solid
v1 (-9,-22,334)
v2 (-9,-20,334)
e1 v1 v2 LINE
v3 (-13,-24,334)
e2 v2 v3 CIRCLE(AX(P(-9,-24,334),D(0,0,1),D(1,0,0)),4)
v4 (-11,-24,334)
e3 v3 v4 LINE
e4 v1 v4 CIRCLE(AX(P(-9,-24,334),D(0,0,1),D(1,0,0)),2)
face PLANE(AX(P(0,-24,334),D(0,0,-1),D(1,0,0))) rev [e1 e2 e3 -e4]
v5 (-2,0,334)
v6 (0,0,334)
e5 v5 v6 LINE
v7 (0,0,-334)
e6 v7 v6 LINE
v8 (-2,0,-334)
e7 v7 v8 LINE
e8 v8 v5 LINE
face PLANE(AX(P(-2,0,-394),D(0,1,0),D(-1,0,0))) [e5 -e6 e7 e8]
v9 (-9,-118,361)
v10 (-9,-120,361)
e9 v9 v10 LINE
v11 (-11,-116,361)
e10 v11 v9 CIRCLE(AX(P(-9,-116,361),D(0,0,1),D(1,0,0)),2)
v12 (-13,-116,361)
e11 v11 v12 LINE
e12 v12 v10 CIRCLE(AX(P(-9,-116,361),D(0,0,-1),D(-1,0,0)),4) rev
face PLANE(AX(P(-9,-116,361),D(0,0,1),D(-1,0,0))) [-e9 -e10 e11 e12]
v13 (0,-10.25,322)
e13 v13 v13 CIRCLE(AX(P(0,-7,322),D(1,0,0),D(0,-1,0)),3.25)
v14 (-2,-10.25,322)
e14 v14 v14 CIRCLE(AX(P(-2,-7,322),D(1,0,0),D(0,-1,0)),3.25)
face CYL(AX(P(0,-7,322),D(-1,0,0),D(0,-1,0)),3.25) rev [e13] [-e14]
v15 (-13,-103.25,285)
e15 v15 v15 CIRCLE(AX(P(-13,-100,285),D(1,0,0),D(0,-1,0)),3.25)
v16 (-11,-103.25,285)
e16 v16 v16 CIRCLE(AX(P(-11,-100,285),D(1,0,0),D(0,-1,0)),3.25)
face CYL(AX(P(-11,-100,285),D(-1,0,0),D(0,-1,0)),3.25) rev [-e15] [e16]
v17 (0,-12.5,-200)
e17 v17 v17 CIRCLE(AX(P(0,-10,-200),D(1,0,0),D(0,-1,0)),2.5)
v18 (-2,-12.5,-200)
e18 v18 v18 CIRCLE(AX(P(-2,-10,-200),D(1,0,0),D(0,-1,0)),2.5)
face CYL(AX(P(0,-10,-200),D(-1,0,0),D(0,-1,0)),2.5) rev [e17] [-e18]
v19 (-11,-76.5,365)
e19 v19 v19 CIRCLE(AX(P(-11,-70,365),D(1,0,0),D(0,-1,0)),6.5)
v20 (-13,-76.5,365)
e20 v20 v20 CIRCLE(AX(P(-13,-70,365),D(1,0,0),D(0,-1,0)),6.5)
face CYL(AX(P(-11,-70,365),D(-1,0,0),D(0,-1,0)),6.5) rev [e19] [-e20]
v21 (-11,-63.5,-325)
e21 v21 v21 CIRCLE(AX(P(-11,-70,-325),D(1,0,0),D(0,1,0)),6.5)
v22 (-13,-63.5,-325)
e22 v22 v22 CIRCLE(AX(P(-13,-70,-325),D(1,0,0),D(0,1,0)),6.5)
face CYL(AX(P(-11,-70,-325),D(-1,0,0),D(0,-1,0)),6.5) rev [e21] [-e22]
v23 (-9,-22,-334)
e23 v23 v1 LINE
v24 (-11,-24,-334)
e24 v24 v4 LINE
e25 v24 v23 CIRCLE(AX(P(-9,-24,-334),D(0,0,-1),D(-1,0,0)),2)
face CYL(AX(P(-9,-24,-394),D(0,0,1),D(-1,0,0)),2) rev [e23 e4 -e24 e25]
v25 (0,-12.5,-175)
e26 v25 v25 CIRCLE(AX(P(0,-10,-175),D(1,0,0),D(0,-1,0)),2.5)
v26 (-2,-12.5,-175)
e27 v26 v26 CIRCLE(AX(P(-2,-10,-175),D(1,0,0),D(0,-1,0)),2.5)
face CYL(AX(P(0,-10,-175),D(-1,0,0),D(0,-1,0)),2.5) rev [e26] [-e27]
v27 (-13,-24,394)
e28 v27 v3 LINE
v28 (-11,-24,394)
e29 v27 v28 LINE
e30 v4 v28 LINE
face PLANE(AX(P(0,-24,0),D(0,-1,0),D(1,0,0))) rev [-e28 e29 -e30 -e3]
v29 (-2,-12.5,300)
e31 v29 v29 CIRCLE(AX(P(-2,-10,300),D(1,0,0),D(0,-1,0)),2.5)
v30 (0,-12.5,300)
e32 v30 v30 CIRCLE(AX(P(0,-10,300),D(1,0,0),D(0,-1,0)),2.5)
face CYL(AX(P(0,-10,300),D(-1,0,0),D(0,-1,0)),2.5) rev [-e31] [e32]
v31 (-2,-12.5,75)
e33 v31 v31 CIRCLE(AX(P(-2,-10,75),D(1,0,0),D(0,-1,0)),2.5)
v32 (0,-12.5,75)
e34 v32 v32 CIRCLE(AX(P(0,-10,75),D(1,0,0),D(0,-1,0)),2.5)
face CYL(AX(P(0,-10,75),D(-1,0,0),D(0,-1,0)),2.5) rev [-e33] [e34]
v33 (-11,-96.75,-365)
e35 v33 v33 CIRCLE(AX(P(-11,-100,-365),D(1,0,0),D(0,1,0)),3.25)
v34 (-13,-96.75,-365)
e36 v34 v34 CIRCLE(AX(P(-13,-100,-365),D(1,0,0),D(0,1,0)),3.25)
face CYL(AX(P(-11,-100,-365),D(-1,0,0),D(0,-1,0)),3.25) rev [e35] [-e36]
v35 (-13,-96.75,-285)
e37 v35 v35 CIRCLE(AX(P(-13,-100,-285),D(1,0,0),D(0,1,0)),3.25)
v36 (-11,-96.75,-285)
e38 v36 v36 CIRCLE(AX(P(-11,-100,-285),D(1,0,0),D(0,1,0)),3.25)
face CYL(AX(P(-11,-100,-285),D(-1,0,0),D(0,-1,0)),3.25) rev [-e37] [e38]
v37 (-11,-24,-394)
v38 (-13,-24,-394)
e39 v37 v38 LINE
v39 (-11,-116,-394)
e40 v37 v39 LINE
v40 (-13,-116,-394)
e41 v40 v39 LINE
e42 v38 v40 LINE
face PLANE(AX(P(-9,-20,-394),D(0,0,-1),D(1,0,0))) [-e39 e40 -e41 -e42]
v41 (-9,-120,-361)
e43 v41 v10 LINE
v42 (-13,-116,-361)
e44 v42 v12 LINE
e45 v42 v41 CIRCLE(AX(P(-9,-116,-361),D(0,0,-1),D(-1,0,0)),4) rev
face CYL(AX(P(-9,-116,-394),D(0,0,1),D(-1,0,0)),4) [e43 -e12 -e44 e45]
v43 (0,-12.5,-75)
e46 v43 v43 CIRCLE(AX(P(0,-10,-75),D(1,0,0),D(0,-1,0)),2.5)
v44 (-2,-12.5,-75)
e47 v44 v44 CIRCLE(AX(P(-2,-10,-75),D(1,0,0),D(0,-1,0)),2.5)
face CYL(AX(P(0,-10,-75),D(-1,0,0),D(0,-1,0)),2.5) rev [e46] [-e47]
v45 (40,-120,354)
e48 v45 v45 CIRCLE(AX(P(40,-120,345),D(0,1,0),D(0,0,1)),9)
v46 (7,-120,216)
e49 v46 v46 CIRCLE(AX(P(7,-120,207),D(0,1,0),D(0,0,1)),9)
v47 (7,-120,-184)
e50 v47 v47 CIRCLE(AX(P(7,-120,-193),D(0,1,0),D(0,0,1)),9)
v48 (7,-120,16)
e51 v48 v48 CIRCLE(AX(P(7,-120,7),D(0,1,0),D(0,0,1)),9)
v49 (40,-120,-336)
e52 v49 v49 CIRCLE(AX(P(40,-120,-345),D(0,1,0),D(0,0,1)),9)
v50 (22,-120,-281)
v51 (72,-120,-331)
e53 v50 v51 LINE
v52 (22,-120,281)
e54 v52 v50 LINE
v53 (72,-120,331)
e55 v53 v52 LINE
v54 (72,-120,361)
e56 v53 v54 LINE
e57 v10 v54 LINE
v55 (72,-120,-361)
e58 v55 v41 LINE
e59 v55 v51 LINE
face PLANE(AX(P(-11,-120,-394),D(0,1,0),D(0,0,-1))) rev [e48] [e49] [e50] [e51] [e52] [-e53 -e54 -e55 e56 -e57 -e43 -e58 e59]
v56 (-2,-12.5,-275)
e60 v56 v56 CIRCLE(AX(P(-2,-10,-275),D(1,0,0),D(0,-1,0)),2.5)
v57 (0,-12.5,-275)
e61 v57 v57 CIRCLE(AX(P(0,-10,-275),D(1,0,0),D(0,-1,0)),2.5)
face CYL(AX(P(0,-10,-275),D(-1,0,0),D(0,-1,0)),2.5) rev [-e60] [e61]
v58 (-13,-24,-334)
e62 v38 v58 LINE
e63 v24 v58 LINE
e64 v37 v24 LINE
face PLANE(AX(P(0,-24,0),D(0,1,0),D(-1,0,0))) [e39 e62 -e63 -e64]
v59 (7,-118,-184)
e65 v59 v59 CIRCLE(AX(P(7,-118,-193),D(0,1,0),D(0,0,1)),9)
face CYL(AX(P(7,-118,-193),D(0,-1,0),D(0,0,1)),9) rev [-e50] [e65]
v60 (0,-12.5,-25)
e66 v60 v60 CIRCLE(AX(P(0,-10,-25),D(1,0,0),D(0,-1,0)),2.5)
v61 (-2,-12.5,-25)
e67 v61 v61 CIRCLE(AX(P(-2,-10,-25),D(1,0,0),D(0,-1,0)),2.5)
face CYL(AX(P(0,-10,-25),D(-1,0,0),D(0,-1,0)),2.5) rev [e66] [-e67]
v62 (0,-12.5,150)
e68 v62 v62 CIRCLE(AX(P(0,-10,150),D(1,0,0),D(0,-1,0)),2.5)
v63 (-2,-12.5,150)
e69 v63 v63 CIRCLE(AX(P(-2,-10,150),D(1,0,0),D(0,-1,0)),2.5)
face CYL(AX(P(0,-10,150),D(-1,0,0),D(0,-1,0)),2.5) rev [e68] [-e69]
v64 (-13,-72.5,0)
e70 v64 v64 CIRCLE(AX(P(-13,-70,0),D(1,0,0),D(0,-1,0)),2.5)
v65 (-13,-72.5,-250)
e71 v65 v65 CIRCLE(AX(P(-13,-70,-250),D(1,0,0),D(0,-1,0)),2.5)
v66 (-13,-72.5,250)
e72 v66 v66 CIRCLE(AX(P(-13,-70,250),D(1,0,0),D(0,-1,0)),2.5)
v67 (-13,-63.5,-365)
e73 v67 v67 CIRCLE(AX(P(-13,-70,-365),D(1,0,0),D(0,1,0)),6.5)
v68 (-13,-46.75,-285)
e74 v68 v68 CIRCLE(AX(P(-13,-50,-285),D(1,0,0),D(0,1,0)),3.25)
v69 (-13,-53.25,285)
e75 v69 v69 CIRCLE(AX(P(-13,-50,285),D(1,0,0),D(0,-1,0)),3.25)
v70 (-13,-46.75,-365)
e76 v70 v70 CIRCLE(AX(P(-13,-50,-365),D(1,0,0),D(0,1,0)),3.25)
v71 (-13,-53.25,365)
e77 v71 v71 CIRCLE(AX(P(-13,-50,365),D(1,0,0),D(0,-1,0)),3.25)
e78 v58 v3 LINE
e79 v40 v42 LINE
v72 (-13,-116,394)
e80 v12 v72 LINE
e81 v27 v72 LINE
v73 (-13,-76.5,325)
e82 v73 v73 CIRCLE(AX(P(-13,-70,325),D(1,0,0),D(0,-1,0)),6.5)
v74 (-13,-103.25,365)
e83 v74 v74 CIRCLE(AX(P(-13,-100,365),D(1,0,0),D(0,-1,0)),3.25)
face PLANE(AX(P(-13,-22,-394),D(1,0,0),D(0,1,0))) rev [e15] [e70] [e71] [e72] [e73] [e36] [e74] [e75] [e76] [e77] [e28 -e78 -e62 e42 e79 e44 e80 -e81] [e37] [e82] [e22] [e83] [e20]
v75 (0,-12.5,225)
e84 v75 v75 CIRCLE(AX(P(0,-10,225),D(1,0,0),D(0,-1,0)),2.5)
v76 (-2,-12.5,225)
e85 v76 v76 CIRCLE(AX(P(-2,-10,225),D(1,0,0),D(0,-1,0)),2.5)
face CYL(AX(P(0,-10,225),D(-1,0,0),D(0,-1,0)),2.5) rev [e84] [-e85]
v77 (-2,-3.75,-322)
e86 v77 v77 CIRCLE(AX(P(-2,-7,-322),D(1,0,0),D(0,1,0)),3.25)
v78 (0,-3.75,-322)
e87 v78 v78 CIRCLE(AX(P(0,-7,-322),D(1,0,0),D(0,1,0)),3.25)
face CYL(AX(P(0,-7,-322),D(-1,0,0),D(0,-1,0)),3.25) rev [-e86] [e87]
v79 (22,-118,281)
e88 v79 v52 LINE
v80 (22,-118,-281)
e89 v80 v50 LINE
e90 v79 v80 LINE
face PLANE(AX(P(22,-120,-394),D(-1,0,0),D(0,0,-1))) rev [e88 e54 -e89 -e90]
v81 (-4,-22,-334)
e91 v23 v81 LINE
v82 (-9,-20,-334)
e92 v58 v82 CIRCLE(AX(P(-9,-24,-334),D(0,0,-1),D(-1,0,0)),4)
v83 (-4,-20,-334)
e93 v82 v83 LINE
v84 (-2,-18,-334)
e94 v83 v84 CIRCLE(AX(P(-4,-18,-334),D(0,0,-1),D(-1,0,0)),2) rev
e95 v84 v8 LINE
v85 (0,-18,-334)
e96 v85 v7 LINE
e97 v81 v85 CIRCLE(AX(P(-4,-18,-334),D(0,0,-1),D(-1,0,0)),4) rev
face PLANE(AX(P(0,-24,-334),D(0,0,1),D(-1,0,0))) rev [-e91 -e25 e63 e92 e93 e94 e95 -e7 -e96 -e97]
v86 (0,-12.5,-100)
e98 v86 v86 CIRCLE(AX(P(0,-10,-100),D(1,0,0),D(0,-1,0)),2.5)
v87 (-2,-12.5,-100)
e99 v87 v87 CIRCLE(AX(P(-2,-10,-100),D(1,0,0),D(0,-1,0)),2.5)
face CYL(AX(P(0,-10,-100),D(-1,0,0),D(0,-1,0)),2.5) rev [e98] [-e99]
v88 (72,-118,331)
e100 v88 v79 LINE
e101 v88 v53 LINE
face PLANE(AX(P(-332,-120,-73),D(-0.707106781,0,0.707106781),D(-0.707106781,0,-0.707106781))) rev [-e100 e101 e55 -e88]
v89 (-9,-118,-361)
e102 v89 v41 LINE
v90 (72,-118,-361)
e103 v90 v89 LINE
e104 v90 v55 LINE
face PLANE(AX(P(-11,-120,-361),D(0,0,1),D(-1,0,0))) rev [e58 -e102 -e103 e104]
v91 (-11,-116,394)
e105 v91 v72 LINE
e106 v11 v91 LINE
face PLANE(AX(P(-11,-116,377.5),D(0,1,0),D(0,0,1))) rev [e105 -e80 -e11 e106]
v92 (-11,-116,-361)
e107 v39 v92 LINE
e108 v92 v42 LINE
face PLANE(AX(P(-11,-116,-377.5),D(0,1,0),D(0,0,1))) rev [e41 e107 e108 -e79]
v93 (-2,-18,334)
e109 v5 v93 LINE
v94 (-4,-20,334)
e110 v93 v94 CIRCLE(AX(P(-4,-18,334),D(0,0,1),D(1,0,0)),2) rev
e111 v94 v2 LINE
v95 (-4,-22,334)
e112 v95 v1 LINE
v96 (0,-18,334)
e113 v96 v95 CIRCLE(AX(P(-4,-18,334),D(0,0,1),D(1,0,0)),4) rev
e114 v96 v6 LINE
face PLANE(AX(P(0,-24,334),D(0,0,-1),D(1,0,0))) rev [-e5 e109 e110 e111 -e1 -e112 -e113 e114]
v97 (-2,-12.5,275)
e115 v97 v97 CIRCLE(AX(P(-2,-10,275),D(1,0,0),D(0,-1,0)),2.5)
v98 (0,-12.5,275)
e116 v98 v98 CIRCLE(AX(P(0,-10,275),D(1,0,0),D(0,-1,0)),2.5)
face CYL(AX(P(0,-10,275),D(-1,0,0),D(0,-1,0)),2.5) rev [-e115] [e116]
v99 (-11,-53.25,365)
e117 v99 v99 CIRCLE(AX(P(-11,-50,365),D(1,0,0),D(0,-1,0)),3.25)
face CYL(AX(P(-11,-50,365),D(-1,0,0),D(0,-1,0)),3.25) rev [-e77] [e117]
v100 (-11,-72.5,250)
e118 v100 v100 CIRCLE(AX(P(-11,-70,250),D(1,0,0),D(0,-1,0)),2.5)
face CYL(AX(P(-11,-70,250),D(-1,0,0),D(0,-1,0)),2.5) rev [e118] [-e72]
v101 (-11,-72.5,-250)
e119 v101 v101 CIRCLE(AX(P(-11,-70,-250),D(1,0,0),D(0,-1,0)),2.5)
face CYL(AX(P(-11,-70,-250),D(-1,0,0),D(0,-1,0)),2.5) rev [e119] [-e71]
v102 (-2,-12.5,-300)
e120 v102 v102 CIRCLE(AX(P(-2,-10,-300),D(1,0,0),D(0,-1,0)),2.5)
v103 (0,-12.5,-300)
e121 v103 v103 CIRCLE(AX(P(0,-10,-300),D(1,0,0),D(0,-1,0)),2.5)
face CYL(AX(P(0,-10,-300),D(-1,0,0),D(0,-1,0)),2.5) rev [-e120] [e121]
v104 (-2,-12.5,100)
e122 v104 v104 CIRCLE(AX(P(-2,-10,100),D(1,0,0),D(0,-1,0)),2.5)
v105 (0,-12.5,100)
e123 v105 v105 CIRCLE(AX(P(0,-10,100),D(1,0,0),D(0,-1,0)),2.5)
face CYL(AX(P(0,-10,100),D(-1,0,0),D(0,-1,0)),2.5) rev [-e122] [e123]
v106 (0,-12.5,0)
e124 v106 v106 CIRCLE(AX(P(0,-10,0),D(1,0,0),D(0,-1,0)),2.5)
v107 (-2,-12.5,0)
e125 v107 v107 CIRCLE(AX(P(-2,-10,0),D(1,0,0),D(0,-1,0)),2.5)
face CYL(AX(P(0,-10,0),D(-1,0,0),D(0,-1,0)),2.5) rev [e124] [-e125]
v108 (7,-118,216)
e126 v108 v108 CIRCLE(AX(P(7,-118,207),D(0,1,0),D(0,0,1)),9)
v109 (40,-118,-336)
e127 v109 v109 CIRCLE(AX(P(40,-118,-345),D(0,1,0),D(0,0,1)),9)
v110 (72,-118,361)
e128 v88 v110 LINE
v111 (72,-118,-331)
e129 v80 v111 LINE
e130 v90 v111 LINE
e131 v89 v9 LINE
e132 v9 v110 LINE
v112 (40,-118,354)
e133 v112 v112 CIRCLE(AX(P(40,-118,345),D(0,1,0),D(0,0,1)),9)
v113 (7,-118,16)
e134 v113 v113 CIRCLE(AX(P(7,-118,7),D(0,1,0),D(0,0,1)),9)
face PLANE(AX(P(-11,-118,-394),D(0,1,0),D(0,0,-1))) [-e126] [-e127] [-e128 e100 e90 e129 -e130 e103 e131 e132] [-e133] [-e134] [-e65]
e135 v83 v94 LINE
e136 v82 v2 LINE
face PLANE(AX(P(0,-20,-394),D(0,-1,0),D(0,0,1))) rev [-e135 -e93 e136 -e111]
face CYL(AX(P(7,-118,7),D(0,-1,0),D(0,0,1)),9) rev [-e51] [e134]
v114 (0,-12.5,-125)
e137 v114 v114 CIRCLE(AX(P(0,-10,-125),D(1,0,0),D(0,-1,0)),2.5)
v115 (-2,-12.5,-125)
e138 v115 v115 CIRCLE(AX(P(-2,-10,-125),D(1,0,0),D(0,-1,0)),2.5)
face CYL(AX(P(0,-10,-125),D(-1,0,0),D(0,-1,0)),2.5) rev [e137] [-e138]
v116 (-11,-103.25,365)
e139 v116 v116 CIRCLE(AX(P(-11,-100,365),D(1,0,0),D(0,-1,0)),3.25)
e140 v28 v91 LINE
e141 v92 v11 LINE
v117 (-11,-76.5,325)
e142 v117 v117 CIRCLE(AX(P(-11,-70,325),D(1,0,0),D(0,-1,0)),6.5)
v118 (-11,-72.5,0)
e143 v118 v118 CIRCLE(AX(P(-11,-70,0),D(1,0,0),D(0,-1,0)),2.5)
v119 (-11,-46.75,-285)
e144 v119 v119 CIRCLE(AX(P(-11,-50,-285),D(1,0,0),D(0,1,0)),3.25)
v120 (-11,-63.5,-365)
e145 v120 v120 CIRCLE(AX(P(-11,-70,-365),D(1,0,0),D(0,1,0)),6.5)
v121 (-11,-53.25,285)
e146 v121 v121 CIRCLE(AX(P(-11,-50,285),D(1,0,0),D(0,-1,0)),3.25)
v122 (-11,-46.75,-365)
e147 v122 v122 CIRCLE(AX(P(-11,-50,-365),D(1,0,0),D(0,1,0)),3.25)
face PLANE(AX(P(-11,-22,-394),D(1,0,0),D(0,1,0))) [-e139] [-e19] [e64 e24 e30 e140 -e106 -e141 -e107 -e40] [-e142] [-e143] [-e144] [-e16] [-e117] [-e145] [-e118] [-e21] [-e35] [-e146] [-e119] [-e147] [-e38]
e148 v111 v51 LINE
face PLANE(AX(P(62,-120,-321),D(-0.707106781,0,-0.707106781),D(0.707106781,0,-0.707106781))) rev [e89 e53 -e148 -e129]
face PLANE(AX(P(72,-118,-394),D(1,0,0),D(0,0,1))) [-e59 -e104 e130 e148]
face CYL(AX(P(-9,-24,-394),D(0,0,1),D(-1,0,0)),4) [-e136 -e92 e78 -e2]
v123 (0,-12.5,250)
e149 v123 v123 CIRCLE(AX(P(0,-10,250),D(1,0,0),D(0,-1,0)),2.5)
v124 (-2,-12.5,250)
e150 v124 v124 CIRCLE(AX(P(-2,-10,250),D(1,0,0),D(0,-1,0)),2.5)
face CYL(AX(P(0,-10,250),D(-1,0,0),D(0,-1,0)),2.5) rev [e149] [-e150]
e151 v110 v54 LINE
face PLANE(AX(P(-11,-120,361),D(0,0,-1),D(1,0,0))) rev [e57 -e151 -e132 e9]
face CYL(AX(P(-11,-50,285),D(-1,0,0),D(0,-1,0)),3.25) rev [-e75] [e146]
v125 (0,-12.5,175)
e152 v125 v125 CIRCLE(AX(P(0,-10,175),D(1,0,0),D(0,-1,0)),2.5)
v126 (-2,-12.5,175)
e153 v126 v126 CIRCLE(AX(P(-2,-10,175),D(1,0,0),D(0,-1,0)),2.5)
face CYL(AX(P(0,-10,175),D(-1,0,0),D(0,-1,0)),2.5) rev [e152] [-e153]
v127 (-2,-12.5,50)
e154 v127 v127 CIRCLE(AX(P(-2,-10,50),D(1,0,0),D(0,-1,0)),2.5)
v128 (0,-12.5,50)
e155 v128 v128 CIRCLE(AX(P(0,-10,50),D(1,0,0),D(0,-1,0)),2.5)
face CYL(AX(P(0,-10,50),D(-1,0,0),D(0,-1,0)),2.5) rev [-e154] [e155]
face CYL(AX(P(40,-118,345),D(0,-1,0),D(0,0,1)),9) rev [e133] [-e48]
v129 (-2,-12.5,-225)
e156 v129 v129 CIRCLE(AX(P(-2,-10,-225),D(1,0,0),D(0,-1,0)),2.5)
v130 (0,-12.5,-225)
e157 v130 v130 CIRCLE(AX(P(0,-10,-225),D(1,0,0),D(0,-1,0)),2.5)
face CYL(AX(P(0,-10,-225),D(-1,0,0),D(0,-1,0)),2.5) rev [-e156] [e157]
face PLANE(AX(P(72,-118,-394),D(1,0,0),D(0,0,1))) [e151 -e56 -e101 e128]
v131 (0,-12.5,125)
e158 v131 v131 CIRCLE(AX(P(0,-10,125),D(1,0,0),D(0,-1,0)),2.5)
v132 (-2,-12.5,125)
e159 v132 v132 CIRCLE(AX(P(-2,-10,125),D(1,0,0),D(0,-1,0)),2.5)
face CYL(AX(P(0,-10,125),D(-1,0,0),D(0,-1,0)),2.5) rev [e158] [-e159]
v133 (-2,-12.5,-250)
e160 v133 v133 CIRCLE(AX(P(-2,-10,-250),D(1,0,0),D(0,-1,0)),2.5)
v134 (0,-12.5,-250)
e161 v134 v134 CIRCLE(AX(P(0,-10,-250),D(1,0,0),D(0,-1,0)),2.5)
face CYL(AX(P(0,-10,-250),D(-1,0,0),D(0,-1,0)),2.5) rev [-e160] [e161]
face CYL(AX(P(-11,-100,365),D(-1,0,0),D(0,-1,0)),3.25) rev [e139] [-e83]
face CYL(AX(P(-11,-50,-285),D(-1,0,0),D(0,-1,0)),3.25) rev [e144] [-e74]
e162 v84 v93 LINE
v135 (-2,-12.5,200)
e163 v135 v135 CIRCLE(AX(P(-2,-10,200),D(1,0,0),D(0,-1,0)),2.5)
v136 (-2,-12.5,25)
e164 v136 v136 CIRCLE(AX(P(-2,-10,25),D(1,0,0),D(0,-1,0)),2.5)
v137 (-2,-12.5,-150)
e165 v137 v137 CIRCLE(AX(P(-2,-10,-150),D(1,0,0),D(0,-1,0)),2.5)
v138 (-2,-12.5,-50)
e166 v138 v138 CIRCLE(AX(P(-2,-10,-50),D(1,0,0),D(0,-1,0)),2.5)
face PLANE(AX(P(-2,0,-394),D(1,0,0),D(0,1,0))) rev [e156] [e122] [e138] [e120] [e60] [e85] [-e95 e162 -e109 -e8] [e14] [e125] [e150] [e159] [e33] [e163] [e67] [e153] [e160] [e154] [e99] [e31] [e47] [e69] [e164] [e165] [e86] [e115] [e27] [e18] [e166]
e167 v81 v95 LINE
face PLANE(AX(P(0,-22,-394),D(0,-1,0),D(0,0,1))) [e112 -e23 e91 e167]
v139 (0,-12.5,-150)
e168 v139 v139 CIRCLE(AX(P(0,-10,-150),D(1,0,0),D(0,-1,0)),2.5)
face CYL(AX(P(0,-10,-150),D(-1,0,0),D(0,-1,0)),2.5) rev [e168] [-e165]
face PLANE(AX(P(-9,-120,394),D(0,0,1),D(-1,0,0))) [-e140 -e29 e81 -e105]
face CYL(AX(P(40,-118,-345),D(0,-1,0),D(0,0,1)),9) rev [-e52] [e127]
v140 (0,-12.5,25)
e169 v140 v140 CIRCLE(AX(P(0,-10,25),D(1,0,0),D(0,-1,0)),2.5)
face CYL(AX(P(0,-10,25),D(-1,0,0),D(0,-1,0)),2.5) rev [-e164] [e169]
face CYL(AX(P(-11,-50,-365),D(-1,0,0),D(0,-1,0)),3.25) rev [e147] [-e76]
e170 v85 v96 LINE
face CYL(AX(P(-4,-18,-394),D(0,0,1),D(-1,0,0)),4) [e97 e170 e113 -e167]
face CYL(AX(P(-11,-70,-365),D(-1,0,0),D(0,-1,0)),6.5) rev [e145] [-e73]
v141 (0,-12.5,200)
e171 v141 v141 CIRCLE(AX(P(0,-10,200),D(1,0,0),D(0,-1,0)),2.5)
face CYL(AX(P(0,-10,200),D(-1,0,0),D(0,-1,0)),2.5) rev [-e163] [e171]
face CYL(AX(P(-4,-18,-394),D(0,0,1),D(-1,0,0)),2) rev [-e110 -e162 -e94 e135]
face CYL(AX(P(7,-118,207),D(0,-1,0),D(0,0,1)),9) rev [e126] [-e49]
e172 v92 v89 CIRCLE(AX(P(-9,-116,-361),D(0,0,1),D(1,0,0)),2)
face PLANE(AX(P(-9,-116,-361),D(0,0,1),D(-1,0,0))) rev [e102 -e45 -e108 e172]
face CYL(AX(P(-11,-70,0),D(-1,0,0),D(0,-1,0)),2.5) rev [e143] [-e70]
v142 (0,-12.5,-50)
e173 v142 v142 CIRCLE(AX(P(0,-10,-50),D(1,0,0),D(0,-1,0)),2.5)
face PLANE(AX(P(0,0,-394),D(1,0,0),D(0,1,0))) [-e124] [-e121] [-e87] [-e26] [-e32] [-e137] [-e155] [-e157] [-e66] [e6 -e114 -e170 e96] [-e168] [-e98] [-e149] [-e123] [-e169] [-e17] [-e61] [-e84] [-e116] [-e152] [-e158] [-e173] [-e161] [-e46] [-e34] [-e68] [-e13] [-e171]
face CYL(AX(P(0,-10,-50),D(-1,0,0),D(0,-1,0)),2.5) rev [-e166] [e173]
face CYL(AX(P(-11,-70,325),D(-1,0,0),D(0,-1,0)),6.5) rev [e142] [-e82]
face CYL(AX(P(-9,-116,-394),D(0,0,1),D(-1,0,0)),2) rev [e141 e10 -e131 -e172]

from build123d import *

# Parameters (mm, degrees)
SM_BASE_FLANGE_1_DEPTH     = 394
SKETCH_6_W                 = 13
SKETCH_6_H                 = 60
CUT_EXTRUDE_1_DEPTH        = 24
CUT_EXTRUDE_START          = -4
SKETCH_7_W                 = 81
SKETCH_7_H                 = 33
SKETCH_7_W_2               = 4
CUT_EXTRUDE_2_DEPTH        = 4
SKETCH_8_R                 = 6.5
SKETCH_8_R_2               = 3.25
SKETCH_8_R_3               = 2.5
CUT_EXTRUDE_3_DEPTH        = 10
SKETCH_9_R                 = 3.25
CUT_EXTRUDE_4_DEPTH        = 10
SKETCH_10_R                = 9
CUT_EXTRUDE_5_DEPTH        = 10
SKETCH_11_R                = 2.5
CUT_EXTRUDE_6_DEPTH        = 10
PATTERN_LINEAR_1_COUNT     = 13
PATTERN_LINEAR_1_PITCH     = 25
PATTERN_LINEAR_1_COL_COUNT = 13
PATTERN_LINEAR_1_COL_PITCH = 25
MOVE_START                 = -120
MOVE_BODY_1_DEPTH          = 2
MOVE_BODY_1_2_DEPTH        = 2


# Read off the part's stored shape, not the designer's step: Тело-Переместить/Копировать1
# Sheet-metal steps are written as plain solids
with BuildPart() as part:
    # Sketch 1 → Базовая кромка1 (new, symmetric)
    with BuildSketch(Plane.XY):
        with BuildLine():
            Line((0, 0), (0, -18))
            ThreePointArc((0, -18), (-1.171572875, -20.828427125), (-4, -22))
            Line((-4, -22), (-9, -22))
            ThreePointArc((-9, -22), (-10.414213562, -22.585786438), (-11, -24))
            Line((-11, -24), (-11, -116))
            ThreePointArc((-11, -116), (-10.414213562, -117.414213562), (-9, -118))
            Line((-9, -118), (72, -118))
            Line((72, -118), (72, -120))
            Line((72, -120), (-9, -120))
            ThreePointArc((-9, -120), (-11.828427125, -118.828427125), (-13, -116))
            Line((-13, -116), (-13, -24))
            ThreePointArc((-13, -24), (-11.828427125, -21.171572875), (-9, -20))
            Line((-9, -20), (-4, -20))
            ThreePointArc((-4, -20), (-2.585786438, -19.414213562), (-2, -18))
            Line((-2, -18), (-2, 0))
            Line((-2, 0), (0, 0))
        make_face()
    extrude(amount=SM_BASE_FLANGE_1_DEPTH, both=True)

    # Эскиз6 → Вырез-Вытянуть1 (cut)
    with BuildSketch(Plane(origin=(0, 0, 0), x_dir=(1, 0, 0), z_dir=(0, 1, 0))):
        with Locations((-6.5, -364)):
            Rectangle(SKETCH_6_W, SKETCH_6_H)
        with Locations((-6.5, 364)):
            Rectangle(SKETCH_6_W, SKETCH_6_H)
    extrude(amount=-CUT_EXTRUDE_1_DEPTH, mode=Mode.SUBTRACT)

    # Эскиз7 → Вырез-Вытянуть2 (cut)
    with BuildSketch(Plane.XZ.offset(120).offset(CUT_EXTRUDE_START)):
        with Locations((31.5, -377.5)):
            Rectangle(SKETCH_7_W, SKETCH_7_H)
        Polygon((22, -281), (72, -331), (72, 331), (22, 281), align=None)
        with Locations((31.5, 377.5)):
            Rectangle(SKETCH_7_W, SKETCH_7_H)
        with Locations((-11, -377.5)):
            Rectangle(SKETCH_7_W_2, SKETCH_7_H)
        with Locations((-11, 377.5)):
            Rectangle(SKETCH_7_W_2, SKETCH_7_H)
    extrude(amount=CUT_EXTRUDE_2_DEPTH, mode=Mode.SUBTRACT)

    # Эскиз8 → Вырез-Вытянуть3 (cut)
    with BuildSketch(Plane.ZY.offset(13)):
        with Locations(Location((-365, -70, 0), (0, 0, 270))):
            Circle(SKETCH_8_R)
        with Locations(Location((-325, -70, 0), (0, 0, 270))):
            Circle(SKETCH_8_R)
        with Locations(Location((-365, -50, 0), (0, 0, 270))):
            Circle(SKETCH_8_R_2)
        with Locations(Location((-365, -100, 0), (0, 0, 270))):
            Circle(SKETCH_8_R_2)
        with Locations(Location((-285, -50, 0), (0, 0, 270))):
            Circle(SKETCH_8_R_2)
        with Locations(Location((-285, -100, 0), (0, 0, 270))):
            Circle(SKETCH_8_R_2)
        with Locations(Location((285, -100, 0), (0, 0, 90))):
            Circle(SKETCH_8_R_2)
        with Locations(Location((285, -50, 0), (0, 0, 90))):
            Circle(SKETCH_8_R_2)
        with Locations(Location((365, -100, 0), (0, 0, 90))):
            Circle(SKETCH_8_R_2)
        with Locations(Location((365, -50, 0), (0, 0, 90))):
            Circle(SKETCH_8_R_2)
        with Locations(Location((325, -70, 0), (0, 0, 90))):
            Circle(SKETCH_8_R)
        with Locations(Location((365, -70, 0), (0, 0, 90))):
            Circle(SKETCH_8_R)
        with Locations(Location((-250, -70, 0), (0, 0, 270))):
            Circle(SKETCH_8_R_3)
        with Locations(Location((0, -70, 0), (0, 0, 270))):
            Circle(SKETCH_8_R_3)
        with Locations(Location((250, -70, 0), (0, 0, 270))):
            Circle(SKETCH_8_R_3)
    extrude(amount=-CUT_EXTRUDE_3_DEPTH, mode=Mode.SUBTRACT)

    # Эскиз9 → Вырез-Вытянуть4 (cut)
    with BuildSketch(Plane.ZY.offset(2)):
        with Locations(Location((-322, -7, 0), (0, 0, 270))):
            Circle(SKETCH_9_R)
        with Locations(Location((322, -7, 0), (0, 0, 90))):
            Circle(SKETCH_9_R)
    extrude(amount=-CUT_EXTRUDE_4_DEPTH, mode=Mode.SUBTRACT)

    # Эскиз10 → Вырез-Вытянуть5 (cut)
    with BuildSketch(Plane.XZ.offset(120)):
        with Locations(Location((40, -345, 0), (0, 0, 270))):
            Circle(SKETCH_10_R)
        with Locations(Location((40, 345, 0), (0, 0, 270))):
            Circle(SKETCH_10_R)
        with Locations(Location((7, -7, 0), (0, 0, 270))):
            Circle(SKETCH_10_R)
        with Locations(Location((7, 193, 0), (0, 0, 270))):
            Circle(SKETCH_10_R)
        with Locations(Location((7, -207, 0), (0, 0, 270))):
            Circle(SKETCH_10_R)
    extrude(amount=-CUT_EXTRUDE_5_DEPTH, mode=Mode.SUBTRACT)

    # Эскиз11 → Вырез-Вытянуть6 (cut)
    with BuildSketch(Plane.ZY.offset(2)):
        with Locations(Location((0, -10, 0), (0, 0, 270))):
            Circle(SKETCH_11_R)
    cut_extrude_6 = extrude(amount=-CUT_EXTRUDE_6_DEPTH, mode=Mode.SUBTRACT)

    # Линейный массив1: Вырез-Вытянуть6 ×13
    with Locations(*[(0, 0, i * PATTERN_LINEAR_1_PITCH) for i in range(1, PATTERN_LINEAR_1_COUNT)]):
        add(cut_extrude_6, mode=Mode.SUBTRACT)

    # Линейный массив1 col: Вырез-Вытянуть6 ×13
    with Locations(*[(0, 0, -i * PATTERN_LINEAR_1_COL_PITCH) for i in range(1, PATTERN_LINEAR_1_COL_COUNT)]):
        add(cut_extrude_6, mode=Mode.SUBTRACT)

    # Move Body 1 outline → Move Body 1 (cut)
    with BuildSketch(Plane(origin=(0, 0, 0), x_dir=(1, 0, 0), z_dir=(0, 1, 0)).offset(MOVE_START)):
        with BuildLine():
            ThreePointArc((1.343145751, 200), (7, 184), (12.656854249, 200))
            ThreePointArc((12.656854249, 200), (7, 198), (1.343145751, 200))
        make_face()
        with BuildLine():
            ThreePointArc((1.343145751, 0), (7, -16), (12.656854249, 0))
            ThreePointArc((12.656854249, 0), (7, -2), (1.343145751, 0))
        make_face()
        with BuildLine():
            ThreePointArc((1.343145751, -200), (7, -216), (12.656854249, -200))
            ThreePointArc((12.656854249, -200), (7, -202), (1.343145751, -200))
        make_face()
    extrude(amount=MOVE_BODY_1_DEPTH, mode=Mode.SUBTRACT)

    # Move Body 1 2 outline → Move Body 1 2 (add)
    with BuildSketch(Plane(origin=(0, 0, 0), x_dir=(1, 0, 0), z_dir=(0, 1, 0)).offset(MOVE_START)):
        with BuildLine():
            ThreePointArc((1.343145751, 200), (7, 202), (12.656854249, 200))
            ThreePointArc((12.656854249, 200), (7, 216), (1.343145751, 200))
        make_face()
        with BuildLine():
            ThreePointArc((1.343145751, 0), (7, 2), (12.656854249, 0))
            ThreePointArc((12.656854249, 0), (7, 16), (1.343145751, 0))
        make_face()
        with BuildLine():
            ThreePointArc((1.343145751, -200), (7, -198), (12.656854249, -200))
            ThreePointArc((12.656854249, -200), (7, -184), (1.343145751, -200))
        make_face()
    extrude(amount=MOVE_BODY_1_2_DEPTH)


solid = part.part
